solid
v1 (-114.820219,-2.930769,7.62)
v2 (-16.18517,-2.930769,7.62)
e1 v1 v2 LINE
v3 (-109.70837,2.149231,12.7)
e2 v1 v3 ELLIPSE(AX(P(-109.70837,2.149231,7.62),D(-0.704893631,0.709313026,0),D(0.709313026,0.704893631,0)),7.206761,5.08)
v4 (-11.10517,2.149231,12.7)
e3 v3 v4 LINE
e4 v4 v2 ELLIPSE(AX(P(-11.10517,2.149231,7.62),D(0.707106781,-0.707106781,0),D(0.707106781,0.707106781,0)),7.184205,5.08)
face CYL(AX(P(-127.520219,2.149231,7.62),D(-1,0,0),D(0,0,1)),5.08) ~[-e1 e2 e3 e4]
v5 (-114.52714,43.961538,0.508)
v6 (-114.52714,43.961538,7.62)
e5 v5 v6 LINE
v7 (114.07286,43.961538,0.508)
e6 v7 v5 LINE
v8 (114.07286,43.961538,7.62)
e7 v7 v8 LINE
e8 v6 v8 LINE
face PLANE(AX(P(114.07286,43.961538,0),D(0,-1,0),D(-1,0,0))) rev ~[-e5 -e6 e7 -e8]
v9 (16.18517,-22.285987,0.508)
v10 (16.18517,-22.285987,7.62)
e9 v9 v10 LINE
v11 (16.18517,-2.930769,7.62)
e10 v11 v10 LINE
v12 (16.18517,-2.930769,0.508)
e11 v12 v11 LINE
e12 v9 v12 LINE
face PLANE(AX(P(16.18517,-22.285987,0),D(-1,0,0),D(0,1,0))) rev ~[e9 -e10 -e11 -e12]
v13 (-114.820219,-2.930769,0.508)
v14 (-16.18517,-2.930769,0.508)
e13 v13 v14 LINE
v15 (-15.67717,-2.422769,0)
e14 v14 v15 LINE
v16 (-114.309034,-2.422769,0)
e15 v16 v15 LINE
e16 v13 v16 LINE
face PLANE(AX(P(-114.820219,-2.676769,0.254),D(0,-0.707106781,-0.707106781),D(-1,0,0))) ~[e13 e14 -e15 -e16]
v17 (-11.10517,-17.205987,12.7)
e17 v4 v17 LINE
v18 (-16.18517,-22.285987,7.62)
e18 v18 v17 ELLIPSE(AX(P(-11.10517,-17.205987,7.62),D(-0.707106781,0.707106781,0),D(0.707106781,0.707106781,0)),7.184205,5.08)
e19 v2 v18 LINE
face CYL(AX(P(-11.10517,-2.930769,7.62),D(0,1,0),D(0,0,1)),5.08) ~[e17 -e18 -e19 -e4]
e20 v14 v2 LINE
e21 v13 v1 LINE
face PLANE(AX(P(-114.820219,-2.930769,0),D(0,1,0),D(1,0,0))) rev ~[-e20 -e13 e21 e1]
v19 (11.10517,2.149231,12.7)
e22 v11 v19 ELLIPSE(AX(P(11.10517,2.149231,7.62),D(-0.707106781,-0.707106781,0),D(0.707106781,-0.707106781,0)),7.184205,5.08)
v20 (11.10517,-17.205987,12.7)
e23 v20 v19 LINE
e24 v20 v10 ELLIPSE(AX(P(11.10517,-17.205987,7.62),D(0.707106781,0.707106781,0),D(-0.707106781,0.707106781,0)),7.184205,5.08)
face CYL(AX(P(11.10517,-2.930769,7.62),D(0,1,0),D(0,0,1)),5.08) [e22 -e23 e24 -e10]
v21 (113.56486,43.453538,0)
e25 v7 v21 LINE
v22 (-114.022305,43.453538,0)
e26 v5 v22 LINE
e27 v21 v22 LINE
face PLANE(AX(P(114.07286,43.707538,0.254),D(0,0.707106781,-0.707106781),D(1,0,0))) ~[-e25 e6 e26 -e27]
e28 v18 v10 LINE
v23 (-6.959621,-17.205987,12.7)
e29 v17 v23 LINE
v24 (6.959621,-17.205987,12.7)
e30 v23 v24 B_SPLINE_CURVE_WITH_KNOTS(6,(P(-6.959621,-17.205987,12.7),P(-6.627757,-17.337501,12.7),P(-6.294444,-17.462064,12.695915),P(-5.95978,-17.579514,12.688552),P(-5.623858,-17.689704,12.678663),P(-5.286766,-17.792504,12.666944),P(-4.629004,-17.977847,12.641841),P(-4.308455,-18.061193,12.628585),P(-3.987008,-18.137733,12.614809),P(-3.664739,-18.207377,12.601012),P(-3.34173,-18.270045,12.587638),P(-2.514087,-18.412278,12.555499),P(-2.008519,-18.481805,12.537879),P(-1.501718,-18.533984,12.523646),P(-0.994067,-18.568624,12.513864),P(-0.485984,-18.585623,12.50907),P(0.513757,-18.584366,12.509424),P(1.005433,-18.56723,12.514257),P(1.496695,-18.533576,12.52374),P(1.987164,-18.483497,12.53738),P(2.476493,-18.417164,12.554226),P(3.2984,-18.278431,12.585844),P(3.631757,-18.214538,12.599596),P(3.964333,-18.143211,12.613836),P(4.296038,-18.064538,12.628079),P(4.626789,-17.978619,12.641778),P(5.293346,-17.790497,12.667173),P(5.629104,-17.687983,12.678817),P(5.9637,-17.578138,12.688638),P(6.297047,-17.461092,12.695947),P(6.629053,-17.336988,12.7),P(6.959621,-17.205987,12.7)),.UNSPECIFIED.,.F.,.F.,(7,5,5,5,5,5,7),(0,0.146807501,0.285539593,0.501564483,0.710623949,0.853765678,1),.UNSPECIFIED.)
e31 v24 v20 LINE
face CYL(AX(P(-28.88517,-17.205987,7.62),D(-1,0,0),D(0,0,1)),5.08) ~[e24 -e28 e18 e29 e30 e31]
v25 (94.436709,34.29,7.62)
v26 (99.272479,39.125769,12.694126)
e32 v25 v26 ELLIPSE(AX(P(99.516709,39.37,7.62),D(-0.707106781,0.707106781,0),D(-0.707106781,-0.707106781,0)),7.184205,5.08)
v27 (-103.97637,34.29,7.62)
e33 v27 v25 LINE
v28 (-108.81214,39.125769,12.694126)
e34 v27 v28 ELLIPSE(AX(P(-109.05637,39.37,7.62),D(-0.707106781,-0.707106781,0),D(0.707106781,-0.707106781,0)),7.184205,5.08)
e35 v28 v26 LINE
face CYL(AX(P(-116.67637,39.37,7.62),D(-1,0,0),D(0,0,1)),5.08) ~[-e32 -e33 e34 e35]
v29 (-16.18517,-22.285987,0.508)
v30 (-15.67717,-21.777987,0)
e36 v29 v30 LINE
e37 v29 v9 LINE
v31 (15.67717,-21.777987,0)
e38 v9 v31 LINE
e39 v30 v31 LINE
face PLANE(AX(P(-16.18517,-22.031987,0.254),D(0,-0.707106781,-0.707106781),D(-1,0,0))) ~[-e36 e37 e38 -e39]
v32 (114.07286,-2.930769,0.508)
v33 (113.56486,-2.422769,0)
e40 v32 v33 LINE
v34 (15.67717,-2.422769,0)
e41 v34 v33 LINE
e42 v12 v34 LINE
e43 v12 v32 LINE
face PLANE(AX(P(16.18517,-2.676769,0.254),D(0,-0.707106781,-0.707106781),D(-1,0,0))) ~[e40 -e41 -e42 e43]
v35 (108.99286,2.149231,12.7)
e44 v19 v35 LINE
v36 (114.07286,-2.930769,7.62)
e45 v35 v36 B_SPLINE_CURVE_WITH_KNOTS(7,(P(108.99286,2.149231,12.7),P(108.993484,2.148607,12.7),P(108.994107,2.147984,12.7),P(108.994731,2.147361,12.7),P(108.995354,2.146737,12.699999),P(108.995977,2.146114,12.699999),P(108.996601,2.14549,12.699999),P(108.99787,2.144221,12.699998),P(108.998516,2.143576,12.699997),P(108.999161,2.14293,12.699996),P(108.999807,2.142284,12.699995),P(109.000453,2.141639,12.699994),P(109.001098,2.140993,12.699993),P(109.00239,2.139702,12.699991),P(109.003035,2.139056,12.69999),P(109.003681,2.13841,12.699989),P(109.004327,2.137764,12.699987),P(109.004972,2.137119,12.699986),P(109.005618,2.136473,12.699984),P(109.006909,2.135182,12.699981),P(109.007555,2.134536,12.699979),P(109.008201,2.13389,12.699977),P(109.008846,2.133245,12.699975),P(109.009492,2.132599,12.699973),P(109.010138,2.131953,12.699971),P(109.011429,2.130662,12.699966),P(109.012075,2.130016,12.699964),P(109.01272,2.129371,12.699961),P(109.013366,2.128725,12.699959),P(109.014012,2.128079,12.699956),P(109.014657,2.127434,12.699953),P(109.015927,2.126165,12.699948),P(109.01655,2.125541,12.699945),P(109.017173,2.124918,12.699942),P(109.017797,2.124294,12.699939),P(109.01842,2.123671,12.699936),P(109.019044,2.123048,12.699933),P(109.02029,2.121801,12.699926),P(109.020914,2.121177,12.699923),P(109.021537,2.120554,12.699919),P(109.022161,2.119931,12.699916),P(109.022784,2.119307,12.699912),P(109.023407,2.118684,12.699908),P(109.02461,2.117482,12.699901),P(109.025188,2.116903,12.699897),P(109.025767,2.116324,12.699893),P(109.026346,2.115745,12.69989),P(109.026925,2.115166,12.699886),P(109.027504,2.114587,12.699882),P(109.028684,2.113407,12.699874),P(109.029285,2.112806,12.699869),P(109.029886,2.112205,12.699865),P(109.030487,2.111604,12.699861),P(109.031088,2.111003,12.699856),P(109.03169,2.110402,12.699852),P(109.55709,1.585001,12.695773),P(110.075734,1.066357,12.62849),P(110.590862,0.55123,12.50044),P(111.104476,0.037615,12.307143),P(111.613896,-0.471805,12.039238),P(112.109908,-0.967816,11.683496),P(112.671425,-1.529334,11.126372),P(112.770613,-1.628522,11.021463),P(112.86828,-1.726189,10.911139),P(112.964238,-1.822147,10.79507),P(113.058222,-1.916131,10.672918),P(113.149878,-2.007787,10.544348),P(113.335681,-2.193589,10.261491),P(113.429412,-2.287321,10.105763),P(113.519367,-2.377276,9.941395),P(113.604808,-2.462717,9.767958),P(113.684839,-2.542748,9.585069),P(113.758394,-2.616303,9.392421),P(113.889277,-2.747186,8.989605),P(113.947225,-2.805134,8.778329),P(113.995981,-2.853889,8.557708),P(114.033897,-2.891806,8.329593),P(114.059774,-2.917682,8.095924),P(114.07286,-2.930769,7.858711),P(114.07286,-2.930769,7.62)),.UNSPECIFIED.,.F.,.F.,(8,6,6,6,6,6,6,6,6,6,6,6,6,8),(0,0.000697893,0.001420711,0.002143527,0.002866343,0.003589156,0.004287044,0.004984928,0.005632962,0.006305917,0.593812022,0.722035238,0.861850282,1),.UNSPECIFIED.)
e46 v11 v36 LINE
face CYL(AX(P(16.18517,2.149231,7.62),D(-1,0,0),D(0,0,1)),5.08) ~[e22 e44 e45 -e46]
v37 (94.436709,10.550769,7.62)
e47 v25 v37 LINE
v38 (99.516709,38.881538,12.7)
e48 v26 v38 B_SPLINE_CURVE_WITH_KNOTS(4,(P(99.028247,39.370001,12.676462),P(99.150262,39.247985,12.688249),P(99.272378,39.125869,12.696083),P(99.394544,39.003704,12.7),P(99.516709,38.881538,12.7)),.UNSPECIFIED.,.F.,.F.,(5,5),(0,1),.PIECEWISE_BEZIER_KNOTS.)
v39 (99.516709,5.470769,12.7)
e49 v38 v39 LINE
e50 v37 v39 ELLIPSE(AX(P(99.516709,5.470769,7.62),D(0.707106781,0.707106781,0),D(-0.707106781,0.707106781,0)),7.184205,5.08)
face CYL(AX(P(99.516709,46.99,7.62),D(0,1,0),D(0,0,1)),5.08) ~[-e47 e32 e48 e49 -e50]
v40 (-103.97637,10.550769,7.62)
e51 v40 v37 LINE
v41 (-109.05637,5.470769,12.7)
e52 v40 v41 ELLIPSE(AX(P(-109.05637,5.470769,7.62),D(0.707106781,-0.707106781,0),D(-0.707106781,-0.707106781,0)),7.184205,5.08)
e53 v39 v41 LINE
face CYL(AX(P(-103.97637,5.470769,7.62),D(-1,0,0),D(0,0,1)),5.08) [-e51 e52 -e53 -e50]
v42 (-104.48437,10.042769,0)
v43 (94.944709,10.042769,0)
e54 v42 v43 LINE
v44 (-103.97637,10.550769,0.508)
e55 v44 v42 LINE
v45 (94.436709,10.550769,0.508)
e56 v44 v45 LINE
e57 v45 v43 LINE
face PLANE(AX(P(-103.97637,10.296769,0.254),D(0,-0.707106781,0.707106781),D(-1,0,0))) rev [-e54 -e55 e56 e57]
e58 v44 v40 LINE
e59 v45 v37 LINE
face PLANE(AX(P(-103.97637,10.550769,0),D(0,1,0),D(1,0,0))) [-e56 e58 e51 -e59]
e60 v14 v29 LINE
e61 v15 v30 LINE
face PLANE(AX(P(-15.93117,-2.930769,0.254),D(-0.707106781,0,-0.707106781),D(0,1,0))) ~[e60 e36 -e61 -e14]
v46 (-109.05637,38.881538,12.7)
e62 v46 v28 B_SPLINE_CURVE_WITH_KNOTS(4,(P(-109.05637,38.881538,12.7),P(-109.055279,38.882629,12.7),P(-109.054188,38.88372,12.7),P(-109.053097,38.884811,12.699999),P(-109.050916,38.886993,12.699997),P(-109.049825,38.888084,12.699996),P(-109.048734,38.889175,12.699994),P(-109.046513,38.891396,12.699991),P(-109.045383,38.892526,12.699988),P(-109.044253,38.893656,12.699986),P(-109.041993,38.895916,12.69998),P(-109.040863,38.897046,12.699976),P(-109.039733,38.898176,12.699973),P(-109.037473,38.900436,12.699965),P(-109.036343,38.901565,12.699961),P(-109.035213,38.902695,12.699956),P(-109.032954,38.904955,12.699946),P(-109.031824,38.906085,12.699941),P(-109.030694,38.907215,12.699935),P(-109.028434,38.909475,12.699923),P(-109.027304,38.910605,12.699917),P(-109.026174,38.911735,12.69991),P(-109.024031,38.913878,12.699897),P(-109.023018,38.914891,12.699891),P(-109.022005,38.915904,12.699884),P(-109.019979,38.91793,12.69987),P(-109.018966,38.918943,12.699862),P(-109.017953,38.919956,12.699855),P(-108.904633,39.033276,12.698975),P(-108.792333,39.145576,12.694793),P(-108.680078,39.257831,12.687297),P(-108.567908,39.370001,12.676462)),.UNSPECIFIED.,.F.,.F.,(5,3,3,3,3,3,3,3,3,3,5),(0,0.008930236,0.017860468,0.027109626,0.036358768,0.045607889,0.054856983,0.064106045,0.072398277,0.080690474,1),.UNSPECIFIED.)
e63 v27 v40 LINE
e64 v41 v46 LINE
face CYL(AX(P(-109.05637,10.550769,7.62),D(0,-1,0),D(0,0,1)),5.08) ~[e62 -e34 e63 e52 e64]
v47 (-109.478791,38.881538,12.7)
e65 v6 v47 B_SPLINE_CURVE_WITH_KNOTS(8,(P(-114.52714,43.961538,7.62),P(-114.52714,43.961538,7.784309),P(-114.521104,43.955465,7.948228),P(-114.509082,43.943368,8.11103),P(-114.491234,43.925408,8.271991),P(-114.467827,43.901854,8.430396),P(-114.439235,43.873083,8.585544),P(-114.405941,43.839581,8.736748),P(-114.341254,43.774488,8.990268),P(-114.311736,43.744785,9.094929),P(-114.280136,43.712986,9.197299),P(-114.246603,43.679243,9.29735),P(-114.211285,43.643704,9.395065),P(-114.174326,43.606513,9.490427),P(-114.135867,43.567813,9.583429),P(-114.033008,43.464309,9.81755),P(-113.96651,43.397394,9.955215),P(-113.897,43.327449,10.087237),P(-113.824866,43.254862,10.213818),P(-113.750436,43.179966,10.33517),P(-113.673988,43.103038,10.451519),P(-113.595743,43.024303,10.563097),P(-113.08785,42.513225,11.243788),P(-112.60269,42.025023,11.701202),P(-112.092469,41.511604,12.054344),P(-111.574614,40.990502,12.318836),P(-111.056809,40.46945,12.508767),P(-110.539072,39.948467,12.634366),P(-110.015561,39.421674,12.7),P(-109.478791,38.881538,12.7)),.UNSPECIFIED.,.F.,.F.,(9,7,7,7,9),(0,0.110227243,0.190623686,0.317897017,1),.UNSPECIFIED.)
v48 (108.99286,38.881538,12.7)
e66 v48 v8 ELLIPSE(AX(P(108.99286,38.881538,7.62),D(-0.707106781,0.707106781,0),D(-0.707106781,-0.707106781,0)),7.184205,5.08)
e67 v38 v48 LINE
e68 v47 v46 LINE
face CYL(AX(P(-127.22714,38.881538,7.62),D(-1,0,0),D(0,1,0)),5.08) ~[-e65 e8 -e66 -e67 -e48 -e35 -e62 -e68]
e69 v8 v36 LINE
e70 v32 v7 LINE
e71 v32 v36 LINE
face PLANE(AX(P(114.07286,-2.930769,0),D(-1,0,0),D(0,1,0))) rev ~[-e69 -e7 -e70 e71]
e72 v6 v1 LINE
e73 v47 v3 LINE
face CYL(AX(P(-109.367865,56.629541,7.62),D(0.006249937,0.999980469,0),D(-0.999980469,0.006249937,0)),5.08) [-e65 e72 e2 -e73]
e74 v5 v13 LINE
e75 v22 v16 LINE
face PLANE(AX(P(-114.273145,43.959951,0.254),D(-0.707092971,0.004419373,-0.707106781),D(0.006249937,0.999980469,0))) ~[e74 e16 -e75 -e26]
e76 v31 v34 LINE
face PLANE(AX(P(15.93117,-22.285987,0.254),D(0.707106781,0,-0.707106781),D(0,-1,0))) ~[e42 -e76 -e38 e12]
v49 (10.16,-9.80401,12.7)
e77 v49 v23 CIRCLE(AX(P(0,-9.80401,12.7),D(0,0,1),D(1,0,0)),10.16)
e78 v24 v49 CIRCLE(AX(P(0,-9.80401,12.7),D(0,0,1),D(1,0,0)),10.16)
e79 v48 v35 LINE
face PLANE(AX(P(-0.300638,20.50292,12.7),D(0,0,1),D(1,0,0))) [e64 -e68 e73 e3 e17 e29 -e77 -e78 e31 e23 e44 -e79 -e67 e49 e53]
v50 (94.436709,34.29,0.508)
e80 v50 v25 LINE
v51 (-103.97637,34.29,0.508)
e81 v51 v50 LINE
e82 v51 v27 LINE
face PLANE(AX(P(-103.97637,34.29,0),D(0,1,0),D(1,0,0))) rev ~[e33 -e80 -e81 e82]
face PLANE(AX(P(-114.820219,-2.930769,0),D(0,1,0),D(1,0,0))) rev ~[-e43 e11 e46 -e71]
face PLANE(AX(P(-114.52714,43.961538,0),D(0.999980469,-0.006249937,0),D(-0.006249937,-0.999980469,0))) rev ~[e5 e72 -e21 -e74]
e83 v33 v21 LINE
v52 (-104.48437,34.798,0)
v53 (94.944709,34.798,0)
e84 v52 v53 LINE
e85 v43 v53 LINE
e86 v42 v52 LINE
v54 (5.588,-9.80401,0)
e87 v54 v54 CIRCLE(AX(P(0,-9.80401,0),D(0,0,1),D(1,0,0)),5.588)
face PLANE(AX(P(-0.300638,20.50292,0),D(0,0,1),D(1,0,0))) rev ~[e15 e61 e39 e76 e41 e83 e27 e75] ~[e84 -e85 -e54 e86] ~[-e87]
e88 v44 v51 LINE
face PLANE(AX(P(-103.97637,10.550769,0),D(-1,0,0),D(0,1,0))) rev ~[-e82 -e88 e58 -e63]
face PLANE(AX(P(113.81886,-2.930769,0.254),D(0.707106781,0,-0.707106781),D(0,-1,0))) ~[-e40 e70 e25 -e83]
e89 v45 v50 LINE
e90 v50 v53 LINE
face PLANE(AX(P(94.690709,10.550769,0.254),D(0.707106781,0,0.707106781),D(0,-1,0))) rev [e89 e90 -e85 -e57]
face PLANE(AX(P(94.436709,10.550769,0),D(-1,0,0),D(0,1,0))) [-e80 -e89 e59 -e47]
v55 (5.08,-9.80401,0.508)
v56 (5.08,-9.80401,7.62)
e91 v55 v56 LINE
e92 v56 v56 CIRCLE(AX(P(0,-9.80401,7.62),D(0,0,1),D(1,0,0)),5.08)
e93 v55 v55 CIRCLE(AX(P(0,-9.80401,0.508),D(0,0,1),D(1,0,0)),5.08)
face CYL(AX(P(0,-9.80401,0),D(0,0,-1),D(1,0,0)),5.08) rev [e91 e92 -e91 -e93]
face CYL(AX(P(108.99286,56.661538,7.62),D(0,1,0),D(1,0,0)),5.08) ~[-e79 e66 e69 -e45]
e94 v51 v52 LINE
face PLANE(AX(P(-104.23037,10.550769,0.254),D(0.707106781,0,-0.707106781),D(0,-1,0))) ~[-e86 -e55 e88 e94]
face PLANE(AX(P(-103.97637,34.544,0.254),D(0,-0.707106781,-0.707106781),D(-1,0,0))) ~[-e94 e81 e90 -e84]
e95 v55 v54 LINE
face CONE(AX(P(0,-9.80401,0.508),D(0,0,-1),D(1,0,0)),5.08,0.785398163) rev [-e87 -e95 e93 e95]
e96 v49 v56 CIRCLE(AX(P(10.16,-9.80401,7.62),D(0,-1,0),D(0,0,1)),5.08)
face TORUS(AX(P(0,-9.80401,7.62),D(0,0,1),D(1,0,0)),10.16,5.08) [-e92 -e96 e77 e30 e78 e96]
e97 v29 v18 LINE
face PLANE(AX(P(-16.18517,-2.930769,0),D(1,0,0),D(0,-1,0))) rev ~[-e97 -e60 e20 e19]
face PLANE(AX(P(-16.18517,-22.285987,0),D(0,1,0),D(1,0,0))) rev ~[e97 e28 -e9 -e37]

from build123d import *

# Parameters (mm, degrees)
F1_R         = 5.08
F2_DEPTH     = 12.7
F0_W         = 198.4130797122
F0_H         = 23.7392307692
F4_T1_DEPTH  = 254
F4_T3_DEPTH  = 72.2932235662
F4_T5_DEPTH  = 111.3350497574
F4_T7_DEPTH  = 32.0552179203
F4_T9_DEPTH  = 57.7703390416
F4_T11_DEPTH = 110.5876909131
F4_T13_DEPTH = 72.2923076923
F4_T15_DEPTH = 23.7392307692
F4_T17_DEPTH = 198.4130797122
F4_T25_DEPTH = 124.0350497574
F4_T29_DEPTH = 44.7552179203
F4_T36_DEPTH = 44.7552179203
F4_T40_DEPTH = 123.2876909131
F4_T47_DEPTH = 36.4392307692
F4_T51_DEPTH = 211.1130797122
F4_T58_DEPTH = 36.4392307692
F4_T62_DEPTH = 211.1130797122
F4_T69_DEPTH = 211.1130797122
F4_T73_DEPTH = 36.4392307692
F4_T80_DEPTH = 36.4392307692
F4_T84_DEPTH = 211.1130797122
F5_SIZE      = 0.508


# Not quite as in the source:
# - a fillet or chamfer that OpenCascade refuses, or shapes differently, is made with other operations: its cross-section is extruded or revolved along the edge and cut away or added


with BuildPart() as f2:
    # F1 (on face) → F2 (new body)
    with BuildSketch(Plane.XY):
        Polygon((16.1851695208, -22.2859871511), (16.1851695208, -2.9307692308), (-16.1851695208, -2.9307692308), (-16.1851695208, -22.2859871511), (0, -22.2859871511), align=None)
        with Locations((0, -9.8040097783)):
            Circle(F1_R, mode=Mode.SUBTRACT)
    extrude(amount=F2_DEPTH)


with BuildPart() as f2b:
    # F0 (on Top) → F2, piece 2 (new body)
    with BuildSketch(Plane.XY):
        Polygon((114.0728604339, 43.9615384615), (-114.5271395661, 43.9615384615), (-114.8202192782, -2.9307692308), (-16.1851695208, -2.9307692308), (16.1851695208, -2.9307692308), (114.0728604339, -2.9307692308), align=None)
        with Locations((-4.7698304792, 22.4203846154)):
            Rectangle(F0_W, F0_H, mode=Mode.SUBTRACT)
    extrude(amount=F2_DEPTH)


with BuildPart() as f2_1:
    add(f2.part)

    # F3: union F2b
    add(f2b.part)

    # F4: fillet of radius 5.08 on 13 edges, made by hand

    # F4_s2 → F4_t1 (cut)
    with BuildSketch(Plane.YZ.offset(-127.2271395661)):
        with BuildLine():
            ThreePointArc((43.9615384615, 7.62), (42.47364091, 11.2121024484), (38.8815384615, 12.7))
            Line((38.8815384615, 12.7), (43.9615384615, 12.7))
            Line((43.9615384615, 12.7), (43.9615384615, 7.62))
        make_face()
    extrude(amount=F4_T1_DEPTH, mode=Mode.SUBTRACT)

    # F4_s4 → F4_t3 (cut)
    with BuildSketch(Plane(origin=(0.3496520758, 55.9437997302, 0), x_dir=(0, 0, 1), z_dir=(-0.0062499374, -0.999980469, 0))):
        with BuildLine():
            ThreePointArc((7.62, 114.7996595946), (11.2121024484, 113.311762043), (12.7, 109.7196595946))
            Line((12.7, 109.7196595946), (12.7, 114.7996595946))
            Line((12.7, 114.7996595946), (7.62, 114.7996595946))
        make_face()
    extrude(amount=F4_T3_DEPTH, mode=Mode.SUBTRACT)

    # F4_s6 → F4_t5 (cut)
    with BuildSketch(Plane.YZ.offset(-127.5202192782)):
        with BuildLine():
            ThreePointArc((2.1492307692, 12.7), (-1.4428716792, 11.2121024484), (-2.9307692308, 7.62))
            Line((-2.9307692308, 7.62), (-2.9307692308, 12.7))
            Line((-2.9307692308, 12.7), (2.1492307692, 12.7))
        make_face()
    extrude(amount=F4_T5_DEPTH, mode=Mode.SUBTRACT)

    # F4_s8 → F4_t7 (cut)
    with BuildSketch(Plane.XZ.offset(2.9307692308)):
        with BuildLine():
            ThreePointArc((-11.1051695208, 12.7), (-14.6972719692, 11.2121024484), (-16.1851695208, 7.62))
            Line((-16.1851695208, 7.62), (-16.1851695208, 12.7))
            Line((-16.1851695208, 12.7), (-11.1051695208, 12.7))
        make_face()
        with BuildLine():
            ThreePointArc((11.1051695208, 12.7), (14.6972719692, 11.2121024484), (16.1851695208, 7.62))
            Line((16.1851695208, 7.62), (16.1851695208, 12.7))
            Line((16.1851695208, 12.7), (11.1051695208, 12.7))
        make_face()
    extrude(amount=F4_T7_DEPTH, mode=Mode.SUBTRACT)

    # F4_s10 → F4_t9 (cut)
    with BuildSketch(Plane.YZ.offset(-28.8851695208)):
        with BuildLine():
            ThreePointArc((-17.2059871511, 12.7), (-20.7980895995, 11.2121024484), (-22.2859871511, 7.62))
            Line((-22.2859871511, 7.62), (-22.2859871511, 12.7))
            Line((-22.2859871511, 12.7), (-17.2059871511, 12.7))
        make_face()
    extrude(amount=F4_T9_DEPTH, mode=Mode.SUBTRACT)

    # F4_s12 → F4_t11 (cut)
    with BuildSketch(Plane.YZ.offset(16.1851695208)):
        with BuildLine():
            ThreePointArc((2.1492307692, 12.7), (-1.4428716792, 11.2121024484), (-2.9307692308, 7.62))
            Line((-2.9307692308, 7.62), (-2.9307692308, 12.7))
            Line((-2.9307692308, 12.7), (2.1492307692, 12.7))
        make_face()
    extrude(amount=F4_T11_DEPTH, mode=Mode.SUBTRACT)

    # F4_s14 → F4_t13 (cut)
    with BuildSketch(Plane.XZ.offset(-56.6615384615)):
        with BuildLine():
            ThreePointArc((114.0728604339, 7.62), (112.5849628824, 11.2121024484), (108.9928604339, 12.7))
            Line((108.9928604339, 12.7), (114.0728604339, 12.7))
            Line((114.0728604339, 12.7), (114.0728604339, 7.62))
        make_face()
    extrude(amount=F4_T13_DEPTH, mode=Mode.SUBTRACT)

    # F4_s16 → F4_t15 (cut)
    with BuildSketch(Plane.XZ.offset(-34.29)):
        with BuildLine():
            ThreePointArc((-109.0563703353, 12.7), (-105.4642678869, 11.2121024484), (-103.9763703353, 7.62))
            Line((-103.9763703353, 7.62), (-103.9763703353, 12.7))
            Line((-103.9763703353, 12.7), (-109.0563703353, 12.7))
        make_face()
        with BuildLine():
            ThreePointArc((99.5167093769, 12.7), (95.9246069285, 11.2121024484), (94.4367093769, 7.62))
            Line((94.4367093769, 7.62), (94.4367093769, 12.7))
            Line((94.4367093769, 12.7), (99.5167093769, 12.7))
        make_face()
    extrude(amount=F4_T15_DEPTH, mode=Mode.SUBTRACT)

    # F4_s18 → F4_t17 (cut)
    with BuildSketch(Plane.YZ.offset(-103.9763703353)):
        with BuildLine():
            ThreePointArc((39.37, 12.7), (35.7778975516, 11.2121024484), (34.29, 7.62))
            Line((34.29, 7.62), (34.29, 12.7))
            Line((34.29, 12.7), (39.37, 12.7))
        make_face()
        with BuildLine():
            ThreePointArc((5.4707692308, 12.7), (9.0628716792, 11.2121024484), (10.5507692308, 7.62))
            Line((10.5507692308, 7.62), (10.5507692308, 12.7))
            Line((10.5507692308, 12.7), (5.4707692308, 12.7))
        make_face()
    extrude(amount=F4_T17_DEPTH, mode=Mode.SUBTRACT)

    # F4_s19 → F4_t20 (revolve, cut)
    with BuildSketch(Plane.XZ.offset(9.8040097783)):
        with BuildLine():
            ThreePointArc((10.16, 12.7), (6.5678975516, 11.2121024484), (5.08, 7.62))
            Line((5.08, 7.62), (5.08, 12.7))
            Line((5.08, 12.7), (10.16, 12.7))
        make_face()
    revolve(axis=Axis((0, -9.8040097783, 12.7), (0, 0, 1)), mode=Mode.SUBTRACT)


with BuildPart() as f4_tool23:
    # F4_s24 → F4_t25 (new body)
    with BuildSketch(Plane.YZ.offset(-3.4851695208)):
        with BuildLine():
            ThreePointArc((2.1492307692, 12.7), (-1.4428716792, 11.2121024484), (-2.9307692308, 7.62))
            Line((-2.9307692308, 7.62), (-2.9307692308, 12.7))
            Line((-2.9307692308, 12.7), (2.1492307692, 12.7))
        make_face()
    extrude(amount=-F4_T25_DEPTH)

    split(bisect_by=Plane.YZ.offset(-16.1851695208), keep=Keep.TOP)


with BuildPart() as f4_tool27:
    # F4_s28 → F4_t29 (new body)
    with BuildSketch(Plane.XZ.offset(-9.7692307692)):
        with BuildLine():
            ThreePointArc((-11.1051695208, 12.7), (-14.6972719692, 11.2121024484), (-16.1851695208, 7.62))
            Line((-16.1851695208, 7.62), (-16.1851695208, 12.7))
            Line((-16.1851695208, 12.7), (-11.1051695208, 12.7))
        make_face()
    extrude(amount=F4_T29_DEPTH)

    split(bisect_by=Plane.XZ.offset(2.9307692308), keep=Keep.BOTTOM)


with BuildPart() as f4_tool23_1:
    add(f4_tool23.part)

    # F4_t31: intersect F4_tool27
    add(f4_tool27.part, mode=Mode.INTERSECT)


with BuildPart() as f2_2:
    add(f2_1.part)

    # F4_t21: cut F4_tool23
    add(f4_tool23_1.part, mode=Mode.SUBTRACT)


with BuildPart() as f4_tool34:
    # F4_s35 → F4_t36 (new body)
    with BuildSketch(Plane.XZ.offset(34.9859871511)):
        with BuildLine():
            ThreePointArc((11.1051695208, 12.7), (14.6972719692, 11.2121024484), (16.1851695208, 7.62))
            Line((16.1851695208, 7.62), (16.1851695208, 12.7))
            Line((16.1851695208, 12.7), (11.1051695208, 12.7))
        make_face()
    extrude(amount=-F4_T36_DEPTH)

    split(bisect_by=Plane.XZ.offset(2.9307692308), keep=Keep.BOTTOM)


with BuildPart() as f4_tool38:
    # F4_s39 → F4_t40 (new body)
    with BuildSketch(Plane.YZ.offset(126.7728604339)):
        with BuildLine():
            ThreePointArc((2.1492307692, 12.7), (-1.4428716792, 11.2121024484), (-2.9307692308, 7.62))
            Line((-2.9307692308, 7.62), (-2.9307692308, 12.7))
            Line((-2.9307692308, 12.7), (2.1492307692, 12.7))
        make_face()
    extrude(amount=-F4_T40_DEPTH)

    split(bisect_by=Plane.YZ.offset(16.1851695208), keep=Keep.BOTTOM)


with BuildPart() as f4_tool34_1:
    add(f4_tool34.part)

    # F4_t42: intersect F4_tool38
    add(f4_tool38.part, mode=Mode.INTERSECT)


with BuildPart() as f2_3:
    add(f2_2.part)

    # F4_t32: cut F4_tool34
    add(f4_tool34_1.part, mode=Mode.SUBTRACT)


with BuildPart() as f4_tool45:
    # F4_s46 → F4_t47 (new body)
    with BuildSketch(Plane.XZ.offset(2.1492307692)):
        with BuildLine():
            ThreePointArc((-109.0563703353, 12.7), (-105.4642678869, 11.2121024484), (-103.9763703353, 7.62))
            Line((-103.9763703353, 7.62), (-103.9763703353, 12.7))
            Line((-103.9763703353, 12.7), (-109.0563703353, 12.7))
        make_face()
    extrude(amount=-F4_T47_DEPTH)

    split(bisect_by=Plane.XZ.offset(-10.5507692308), keep=Keep.TOP)


with BuildPart() as f4_tool49:
    # F4_s50 → F4_t51 (new body)
    with BuildSketch(Plane.YZ.offset(94.4367093769)):
        with BuildLine():
            ThreePointArc((5.4707692308, 12.7), (9.0628716792, 11.2121024484), (10.5507692308, 7.62))
            Line((10.5507692308, 7.62), (10.5507692308, 12.7))
            Line((10.5507692308, 12.7), (5.4707692308, 12.7))
        make_face()
    extrude(amount=-F4_T51_DEPTH)

    split(bisect_by=Plane.YZ.offset(-103.9763703353), keep=Keep.BOTTOM)


with BuildPart() as f4_tool45_1:
    add(f4_tool45.part)

    # F4_t53: intersect F4_tool49
    add(f4_tool49.part, mode=Mode.INTERSECT)


with BuildPart() as f2_4:
    add(f2_3.part)

    # F4_t43: cut F4_tool45
    add(f4_tool45_1.part, mode=Mode.SUBTRACT)


with BuildPart() as f4_tool56:
    # F4_s57 → F4_t58 (new body)
    with BuildSketch(Plane.XZ.offset(-10.5507692308)):
        with BuildLine():
            ThreePointArc((-109.0563703353, 12.7), (-105.4642678869, 11.2121024484), (-103.9763703353, 7.62))
            Line((-103.9763703353, 7.62), (-103.9763703353, 12.7))
            Line((-103.9763703353, 12.7), (-109.0563703353, 12.7))
        make_face()
    extrude(amount=-F4_T58_DEPTH)

    split(bisect_by=Plane.XZ.offset(-34.29), keep=Keep.BOTTOM)


with BuildPart() as f4_tool60:
    # F4_s61 → F4_t62 (new body)
    with BuildSketch(Plane.YZ.offset(-116.6763703353)):
        with BuildLine():
            ThreePointArc((39.37, 12.7), (35.7778975516, 11.2121024484), (34.29, 7.62))
            Line((34.29, 7.62), (34.29, 12.7))
            Line((34.29, 12.7), (39.37, 12.7))
        make_face()
    extrude(amount=F4_T62_DEPTH)

    split(bisect_by=Plane.YZ.offset(-103.9763703353), keep=Keep.BOTTOM)


with BuildPart() as f4_tool56_1:
    add(f4_tool56.part)

    # F4_t64: intersect F4_tool60
    add(f4_tool60.part, mode=Mode.INTERSECT)


with BuildPart() as f2_5:
    add(f2_4.part)

    # F4_t54: cut F4_tool56
    add(f4_tool56_1.part, mode=Mode.SUBTRACT)


with BuildPart() as f4_tool67:
    # F4_s68 → F4_t69 (new body)
    with BuildSketch(Plane.YZ.offset(-103.9763703353)):
        with BuildLine():
            ThreePointArc((39.37, 12.7), (35.7778975516, 11.2121024484), (34.29, 7.62))
            Line((34.29, 7.62), (34.29, 12.7))
            Line((34.29, 12.7), (39.37, 12.7))
        make_face()
    extrude(amount=F4_T69_DEPTH)

    split(bisect_by=Plane.YZ.offset(94.4367093769), keep=Keep.TOP)


with BuildPart() as f4_tool71:
    # F4_s72 → F4_t73 (new body)
    with BuildSketch(Plane.XZ.offset(-46.99)):
        with BuildLine():
            ThreePointArc((99.5167093769, 12.7), (95.9246069285, 11.2121024484), (94.4367093769, 7.62))
            Line((94.4367093769, 7.62), (94.4367093769, 12.7))
            Line((94.4367093769, 12.7), (99.5167093769, 12.7))
        make_face()
    extrude(amount=F4_T73_DEPTH)

    split(bisect_by=Plane.XZ.offset(-34.29), keep=Keep.BOTTOM)


with BuildPart() as f4_tool67_1:
    add(f4_tool67.part)

    # F4_t75: intersect F4_tool71
    add(f4_tool71.part, mode=Mode.INTERSECT)


with BuildPart() as f2_6:
    add(f2_5.part)

    # F4_t65: cut F4_tool67
    add(f4_tool67_1.part, mode=Mode.SUBTRACT)


with BuildPart() as f4_tool78:
    # F4_s79 → F4_t80 (new body)
    with BuildSketch(Plane.XZ.offset(-34.29)):
        with BuildLine():
            ThreePointArc((99.5167093769, 12.7), (95.9246069285, 11.2121024484), (94.4367093769, 7.62))
            Line((94.4367093769, 7.62), (94.4367093769, 12.7))
            Line((94.4367093769, 12.7), (99.5167093769, 12.7))
        make_face()
    extrude(amount=F4_T80_DEPTH)

    split(bisect_by=Plane.XZ.offset(-10.5507692308), keep=Keep.TOP)


with BuildPart() as f4_tool82:
    # F4_s83 → F4_t84 (new body)
    with BuildSketch(Plane.YZ.offset(107.1367093769)):
        with BuildLine():
            ThreePointArc((5.4707692308, 12.7), (9.0628716792, 11.2121024484), (10.5507692308, 7.62))
            Line((10.5507692308, 7.62), (10.5507692308, 12.7))
            Line((10.5507692308, 12.7), (5.4707692308, 12.7))
        make_face()
    extrude(amount=-F4_T84_DEPTH)

    split(bisect_by=Plane.YZ.offset(94.4367093769), keep=Keep.TOP)


with BuildPart() as f4_tool78_1:
    add(f4_tool78.part)

    # F4_t86: intersect F4_tool82
    add(f4_tool82.part, mode=Mode.INTERSECT)


with BuildPart() as f2_7:
    add(f2_6.part)

    # F4_t76: cut F4_tool78
    add(f4_tool78_1.part, mode=Mode.SUBTRACT)

    # F5
    f5_edges = [f2_7.edges().sort_by_distance(p)[0] for p in [
        (-0.22714, 43.961538, 0),
        (-114.673679, 20.515385, 0),
        (-65.502694, -2.930769, 0),
        (-16.18517, -12.608378, 0),
        (0, -22.285987, 0),
        (16.18517, -12.608378, 0),
        (65.129015, -2.930769, 0),
        (114.07286, 20.515385, 0),
        (-103.97637, 22.420385, 0),
        (-4.76983, 34.29, 0),
        (94.436709, 22.420385, 0),
        (-4.76983, 10.550769, 0),
        (-5.08, -9.80401, 0),
    ]]
    chamfer(f5_edges, length=F5_SIZE)


solid = f2_7.part
